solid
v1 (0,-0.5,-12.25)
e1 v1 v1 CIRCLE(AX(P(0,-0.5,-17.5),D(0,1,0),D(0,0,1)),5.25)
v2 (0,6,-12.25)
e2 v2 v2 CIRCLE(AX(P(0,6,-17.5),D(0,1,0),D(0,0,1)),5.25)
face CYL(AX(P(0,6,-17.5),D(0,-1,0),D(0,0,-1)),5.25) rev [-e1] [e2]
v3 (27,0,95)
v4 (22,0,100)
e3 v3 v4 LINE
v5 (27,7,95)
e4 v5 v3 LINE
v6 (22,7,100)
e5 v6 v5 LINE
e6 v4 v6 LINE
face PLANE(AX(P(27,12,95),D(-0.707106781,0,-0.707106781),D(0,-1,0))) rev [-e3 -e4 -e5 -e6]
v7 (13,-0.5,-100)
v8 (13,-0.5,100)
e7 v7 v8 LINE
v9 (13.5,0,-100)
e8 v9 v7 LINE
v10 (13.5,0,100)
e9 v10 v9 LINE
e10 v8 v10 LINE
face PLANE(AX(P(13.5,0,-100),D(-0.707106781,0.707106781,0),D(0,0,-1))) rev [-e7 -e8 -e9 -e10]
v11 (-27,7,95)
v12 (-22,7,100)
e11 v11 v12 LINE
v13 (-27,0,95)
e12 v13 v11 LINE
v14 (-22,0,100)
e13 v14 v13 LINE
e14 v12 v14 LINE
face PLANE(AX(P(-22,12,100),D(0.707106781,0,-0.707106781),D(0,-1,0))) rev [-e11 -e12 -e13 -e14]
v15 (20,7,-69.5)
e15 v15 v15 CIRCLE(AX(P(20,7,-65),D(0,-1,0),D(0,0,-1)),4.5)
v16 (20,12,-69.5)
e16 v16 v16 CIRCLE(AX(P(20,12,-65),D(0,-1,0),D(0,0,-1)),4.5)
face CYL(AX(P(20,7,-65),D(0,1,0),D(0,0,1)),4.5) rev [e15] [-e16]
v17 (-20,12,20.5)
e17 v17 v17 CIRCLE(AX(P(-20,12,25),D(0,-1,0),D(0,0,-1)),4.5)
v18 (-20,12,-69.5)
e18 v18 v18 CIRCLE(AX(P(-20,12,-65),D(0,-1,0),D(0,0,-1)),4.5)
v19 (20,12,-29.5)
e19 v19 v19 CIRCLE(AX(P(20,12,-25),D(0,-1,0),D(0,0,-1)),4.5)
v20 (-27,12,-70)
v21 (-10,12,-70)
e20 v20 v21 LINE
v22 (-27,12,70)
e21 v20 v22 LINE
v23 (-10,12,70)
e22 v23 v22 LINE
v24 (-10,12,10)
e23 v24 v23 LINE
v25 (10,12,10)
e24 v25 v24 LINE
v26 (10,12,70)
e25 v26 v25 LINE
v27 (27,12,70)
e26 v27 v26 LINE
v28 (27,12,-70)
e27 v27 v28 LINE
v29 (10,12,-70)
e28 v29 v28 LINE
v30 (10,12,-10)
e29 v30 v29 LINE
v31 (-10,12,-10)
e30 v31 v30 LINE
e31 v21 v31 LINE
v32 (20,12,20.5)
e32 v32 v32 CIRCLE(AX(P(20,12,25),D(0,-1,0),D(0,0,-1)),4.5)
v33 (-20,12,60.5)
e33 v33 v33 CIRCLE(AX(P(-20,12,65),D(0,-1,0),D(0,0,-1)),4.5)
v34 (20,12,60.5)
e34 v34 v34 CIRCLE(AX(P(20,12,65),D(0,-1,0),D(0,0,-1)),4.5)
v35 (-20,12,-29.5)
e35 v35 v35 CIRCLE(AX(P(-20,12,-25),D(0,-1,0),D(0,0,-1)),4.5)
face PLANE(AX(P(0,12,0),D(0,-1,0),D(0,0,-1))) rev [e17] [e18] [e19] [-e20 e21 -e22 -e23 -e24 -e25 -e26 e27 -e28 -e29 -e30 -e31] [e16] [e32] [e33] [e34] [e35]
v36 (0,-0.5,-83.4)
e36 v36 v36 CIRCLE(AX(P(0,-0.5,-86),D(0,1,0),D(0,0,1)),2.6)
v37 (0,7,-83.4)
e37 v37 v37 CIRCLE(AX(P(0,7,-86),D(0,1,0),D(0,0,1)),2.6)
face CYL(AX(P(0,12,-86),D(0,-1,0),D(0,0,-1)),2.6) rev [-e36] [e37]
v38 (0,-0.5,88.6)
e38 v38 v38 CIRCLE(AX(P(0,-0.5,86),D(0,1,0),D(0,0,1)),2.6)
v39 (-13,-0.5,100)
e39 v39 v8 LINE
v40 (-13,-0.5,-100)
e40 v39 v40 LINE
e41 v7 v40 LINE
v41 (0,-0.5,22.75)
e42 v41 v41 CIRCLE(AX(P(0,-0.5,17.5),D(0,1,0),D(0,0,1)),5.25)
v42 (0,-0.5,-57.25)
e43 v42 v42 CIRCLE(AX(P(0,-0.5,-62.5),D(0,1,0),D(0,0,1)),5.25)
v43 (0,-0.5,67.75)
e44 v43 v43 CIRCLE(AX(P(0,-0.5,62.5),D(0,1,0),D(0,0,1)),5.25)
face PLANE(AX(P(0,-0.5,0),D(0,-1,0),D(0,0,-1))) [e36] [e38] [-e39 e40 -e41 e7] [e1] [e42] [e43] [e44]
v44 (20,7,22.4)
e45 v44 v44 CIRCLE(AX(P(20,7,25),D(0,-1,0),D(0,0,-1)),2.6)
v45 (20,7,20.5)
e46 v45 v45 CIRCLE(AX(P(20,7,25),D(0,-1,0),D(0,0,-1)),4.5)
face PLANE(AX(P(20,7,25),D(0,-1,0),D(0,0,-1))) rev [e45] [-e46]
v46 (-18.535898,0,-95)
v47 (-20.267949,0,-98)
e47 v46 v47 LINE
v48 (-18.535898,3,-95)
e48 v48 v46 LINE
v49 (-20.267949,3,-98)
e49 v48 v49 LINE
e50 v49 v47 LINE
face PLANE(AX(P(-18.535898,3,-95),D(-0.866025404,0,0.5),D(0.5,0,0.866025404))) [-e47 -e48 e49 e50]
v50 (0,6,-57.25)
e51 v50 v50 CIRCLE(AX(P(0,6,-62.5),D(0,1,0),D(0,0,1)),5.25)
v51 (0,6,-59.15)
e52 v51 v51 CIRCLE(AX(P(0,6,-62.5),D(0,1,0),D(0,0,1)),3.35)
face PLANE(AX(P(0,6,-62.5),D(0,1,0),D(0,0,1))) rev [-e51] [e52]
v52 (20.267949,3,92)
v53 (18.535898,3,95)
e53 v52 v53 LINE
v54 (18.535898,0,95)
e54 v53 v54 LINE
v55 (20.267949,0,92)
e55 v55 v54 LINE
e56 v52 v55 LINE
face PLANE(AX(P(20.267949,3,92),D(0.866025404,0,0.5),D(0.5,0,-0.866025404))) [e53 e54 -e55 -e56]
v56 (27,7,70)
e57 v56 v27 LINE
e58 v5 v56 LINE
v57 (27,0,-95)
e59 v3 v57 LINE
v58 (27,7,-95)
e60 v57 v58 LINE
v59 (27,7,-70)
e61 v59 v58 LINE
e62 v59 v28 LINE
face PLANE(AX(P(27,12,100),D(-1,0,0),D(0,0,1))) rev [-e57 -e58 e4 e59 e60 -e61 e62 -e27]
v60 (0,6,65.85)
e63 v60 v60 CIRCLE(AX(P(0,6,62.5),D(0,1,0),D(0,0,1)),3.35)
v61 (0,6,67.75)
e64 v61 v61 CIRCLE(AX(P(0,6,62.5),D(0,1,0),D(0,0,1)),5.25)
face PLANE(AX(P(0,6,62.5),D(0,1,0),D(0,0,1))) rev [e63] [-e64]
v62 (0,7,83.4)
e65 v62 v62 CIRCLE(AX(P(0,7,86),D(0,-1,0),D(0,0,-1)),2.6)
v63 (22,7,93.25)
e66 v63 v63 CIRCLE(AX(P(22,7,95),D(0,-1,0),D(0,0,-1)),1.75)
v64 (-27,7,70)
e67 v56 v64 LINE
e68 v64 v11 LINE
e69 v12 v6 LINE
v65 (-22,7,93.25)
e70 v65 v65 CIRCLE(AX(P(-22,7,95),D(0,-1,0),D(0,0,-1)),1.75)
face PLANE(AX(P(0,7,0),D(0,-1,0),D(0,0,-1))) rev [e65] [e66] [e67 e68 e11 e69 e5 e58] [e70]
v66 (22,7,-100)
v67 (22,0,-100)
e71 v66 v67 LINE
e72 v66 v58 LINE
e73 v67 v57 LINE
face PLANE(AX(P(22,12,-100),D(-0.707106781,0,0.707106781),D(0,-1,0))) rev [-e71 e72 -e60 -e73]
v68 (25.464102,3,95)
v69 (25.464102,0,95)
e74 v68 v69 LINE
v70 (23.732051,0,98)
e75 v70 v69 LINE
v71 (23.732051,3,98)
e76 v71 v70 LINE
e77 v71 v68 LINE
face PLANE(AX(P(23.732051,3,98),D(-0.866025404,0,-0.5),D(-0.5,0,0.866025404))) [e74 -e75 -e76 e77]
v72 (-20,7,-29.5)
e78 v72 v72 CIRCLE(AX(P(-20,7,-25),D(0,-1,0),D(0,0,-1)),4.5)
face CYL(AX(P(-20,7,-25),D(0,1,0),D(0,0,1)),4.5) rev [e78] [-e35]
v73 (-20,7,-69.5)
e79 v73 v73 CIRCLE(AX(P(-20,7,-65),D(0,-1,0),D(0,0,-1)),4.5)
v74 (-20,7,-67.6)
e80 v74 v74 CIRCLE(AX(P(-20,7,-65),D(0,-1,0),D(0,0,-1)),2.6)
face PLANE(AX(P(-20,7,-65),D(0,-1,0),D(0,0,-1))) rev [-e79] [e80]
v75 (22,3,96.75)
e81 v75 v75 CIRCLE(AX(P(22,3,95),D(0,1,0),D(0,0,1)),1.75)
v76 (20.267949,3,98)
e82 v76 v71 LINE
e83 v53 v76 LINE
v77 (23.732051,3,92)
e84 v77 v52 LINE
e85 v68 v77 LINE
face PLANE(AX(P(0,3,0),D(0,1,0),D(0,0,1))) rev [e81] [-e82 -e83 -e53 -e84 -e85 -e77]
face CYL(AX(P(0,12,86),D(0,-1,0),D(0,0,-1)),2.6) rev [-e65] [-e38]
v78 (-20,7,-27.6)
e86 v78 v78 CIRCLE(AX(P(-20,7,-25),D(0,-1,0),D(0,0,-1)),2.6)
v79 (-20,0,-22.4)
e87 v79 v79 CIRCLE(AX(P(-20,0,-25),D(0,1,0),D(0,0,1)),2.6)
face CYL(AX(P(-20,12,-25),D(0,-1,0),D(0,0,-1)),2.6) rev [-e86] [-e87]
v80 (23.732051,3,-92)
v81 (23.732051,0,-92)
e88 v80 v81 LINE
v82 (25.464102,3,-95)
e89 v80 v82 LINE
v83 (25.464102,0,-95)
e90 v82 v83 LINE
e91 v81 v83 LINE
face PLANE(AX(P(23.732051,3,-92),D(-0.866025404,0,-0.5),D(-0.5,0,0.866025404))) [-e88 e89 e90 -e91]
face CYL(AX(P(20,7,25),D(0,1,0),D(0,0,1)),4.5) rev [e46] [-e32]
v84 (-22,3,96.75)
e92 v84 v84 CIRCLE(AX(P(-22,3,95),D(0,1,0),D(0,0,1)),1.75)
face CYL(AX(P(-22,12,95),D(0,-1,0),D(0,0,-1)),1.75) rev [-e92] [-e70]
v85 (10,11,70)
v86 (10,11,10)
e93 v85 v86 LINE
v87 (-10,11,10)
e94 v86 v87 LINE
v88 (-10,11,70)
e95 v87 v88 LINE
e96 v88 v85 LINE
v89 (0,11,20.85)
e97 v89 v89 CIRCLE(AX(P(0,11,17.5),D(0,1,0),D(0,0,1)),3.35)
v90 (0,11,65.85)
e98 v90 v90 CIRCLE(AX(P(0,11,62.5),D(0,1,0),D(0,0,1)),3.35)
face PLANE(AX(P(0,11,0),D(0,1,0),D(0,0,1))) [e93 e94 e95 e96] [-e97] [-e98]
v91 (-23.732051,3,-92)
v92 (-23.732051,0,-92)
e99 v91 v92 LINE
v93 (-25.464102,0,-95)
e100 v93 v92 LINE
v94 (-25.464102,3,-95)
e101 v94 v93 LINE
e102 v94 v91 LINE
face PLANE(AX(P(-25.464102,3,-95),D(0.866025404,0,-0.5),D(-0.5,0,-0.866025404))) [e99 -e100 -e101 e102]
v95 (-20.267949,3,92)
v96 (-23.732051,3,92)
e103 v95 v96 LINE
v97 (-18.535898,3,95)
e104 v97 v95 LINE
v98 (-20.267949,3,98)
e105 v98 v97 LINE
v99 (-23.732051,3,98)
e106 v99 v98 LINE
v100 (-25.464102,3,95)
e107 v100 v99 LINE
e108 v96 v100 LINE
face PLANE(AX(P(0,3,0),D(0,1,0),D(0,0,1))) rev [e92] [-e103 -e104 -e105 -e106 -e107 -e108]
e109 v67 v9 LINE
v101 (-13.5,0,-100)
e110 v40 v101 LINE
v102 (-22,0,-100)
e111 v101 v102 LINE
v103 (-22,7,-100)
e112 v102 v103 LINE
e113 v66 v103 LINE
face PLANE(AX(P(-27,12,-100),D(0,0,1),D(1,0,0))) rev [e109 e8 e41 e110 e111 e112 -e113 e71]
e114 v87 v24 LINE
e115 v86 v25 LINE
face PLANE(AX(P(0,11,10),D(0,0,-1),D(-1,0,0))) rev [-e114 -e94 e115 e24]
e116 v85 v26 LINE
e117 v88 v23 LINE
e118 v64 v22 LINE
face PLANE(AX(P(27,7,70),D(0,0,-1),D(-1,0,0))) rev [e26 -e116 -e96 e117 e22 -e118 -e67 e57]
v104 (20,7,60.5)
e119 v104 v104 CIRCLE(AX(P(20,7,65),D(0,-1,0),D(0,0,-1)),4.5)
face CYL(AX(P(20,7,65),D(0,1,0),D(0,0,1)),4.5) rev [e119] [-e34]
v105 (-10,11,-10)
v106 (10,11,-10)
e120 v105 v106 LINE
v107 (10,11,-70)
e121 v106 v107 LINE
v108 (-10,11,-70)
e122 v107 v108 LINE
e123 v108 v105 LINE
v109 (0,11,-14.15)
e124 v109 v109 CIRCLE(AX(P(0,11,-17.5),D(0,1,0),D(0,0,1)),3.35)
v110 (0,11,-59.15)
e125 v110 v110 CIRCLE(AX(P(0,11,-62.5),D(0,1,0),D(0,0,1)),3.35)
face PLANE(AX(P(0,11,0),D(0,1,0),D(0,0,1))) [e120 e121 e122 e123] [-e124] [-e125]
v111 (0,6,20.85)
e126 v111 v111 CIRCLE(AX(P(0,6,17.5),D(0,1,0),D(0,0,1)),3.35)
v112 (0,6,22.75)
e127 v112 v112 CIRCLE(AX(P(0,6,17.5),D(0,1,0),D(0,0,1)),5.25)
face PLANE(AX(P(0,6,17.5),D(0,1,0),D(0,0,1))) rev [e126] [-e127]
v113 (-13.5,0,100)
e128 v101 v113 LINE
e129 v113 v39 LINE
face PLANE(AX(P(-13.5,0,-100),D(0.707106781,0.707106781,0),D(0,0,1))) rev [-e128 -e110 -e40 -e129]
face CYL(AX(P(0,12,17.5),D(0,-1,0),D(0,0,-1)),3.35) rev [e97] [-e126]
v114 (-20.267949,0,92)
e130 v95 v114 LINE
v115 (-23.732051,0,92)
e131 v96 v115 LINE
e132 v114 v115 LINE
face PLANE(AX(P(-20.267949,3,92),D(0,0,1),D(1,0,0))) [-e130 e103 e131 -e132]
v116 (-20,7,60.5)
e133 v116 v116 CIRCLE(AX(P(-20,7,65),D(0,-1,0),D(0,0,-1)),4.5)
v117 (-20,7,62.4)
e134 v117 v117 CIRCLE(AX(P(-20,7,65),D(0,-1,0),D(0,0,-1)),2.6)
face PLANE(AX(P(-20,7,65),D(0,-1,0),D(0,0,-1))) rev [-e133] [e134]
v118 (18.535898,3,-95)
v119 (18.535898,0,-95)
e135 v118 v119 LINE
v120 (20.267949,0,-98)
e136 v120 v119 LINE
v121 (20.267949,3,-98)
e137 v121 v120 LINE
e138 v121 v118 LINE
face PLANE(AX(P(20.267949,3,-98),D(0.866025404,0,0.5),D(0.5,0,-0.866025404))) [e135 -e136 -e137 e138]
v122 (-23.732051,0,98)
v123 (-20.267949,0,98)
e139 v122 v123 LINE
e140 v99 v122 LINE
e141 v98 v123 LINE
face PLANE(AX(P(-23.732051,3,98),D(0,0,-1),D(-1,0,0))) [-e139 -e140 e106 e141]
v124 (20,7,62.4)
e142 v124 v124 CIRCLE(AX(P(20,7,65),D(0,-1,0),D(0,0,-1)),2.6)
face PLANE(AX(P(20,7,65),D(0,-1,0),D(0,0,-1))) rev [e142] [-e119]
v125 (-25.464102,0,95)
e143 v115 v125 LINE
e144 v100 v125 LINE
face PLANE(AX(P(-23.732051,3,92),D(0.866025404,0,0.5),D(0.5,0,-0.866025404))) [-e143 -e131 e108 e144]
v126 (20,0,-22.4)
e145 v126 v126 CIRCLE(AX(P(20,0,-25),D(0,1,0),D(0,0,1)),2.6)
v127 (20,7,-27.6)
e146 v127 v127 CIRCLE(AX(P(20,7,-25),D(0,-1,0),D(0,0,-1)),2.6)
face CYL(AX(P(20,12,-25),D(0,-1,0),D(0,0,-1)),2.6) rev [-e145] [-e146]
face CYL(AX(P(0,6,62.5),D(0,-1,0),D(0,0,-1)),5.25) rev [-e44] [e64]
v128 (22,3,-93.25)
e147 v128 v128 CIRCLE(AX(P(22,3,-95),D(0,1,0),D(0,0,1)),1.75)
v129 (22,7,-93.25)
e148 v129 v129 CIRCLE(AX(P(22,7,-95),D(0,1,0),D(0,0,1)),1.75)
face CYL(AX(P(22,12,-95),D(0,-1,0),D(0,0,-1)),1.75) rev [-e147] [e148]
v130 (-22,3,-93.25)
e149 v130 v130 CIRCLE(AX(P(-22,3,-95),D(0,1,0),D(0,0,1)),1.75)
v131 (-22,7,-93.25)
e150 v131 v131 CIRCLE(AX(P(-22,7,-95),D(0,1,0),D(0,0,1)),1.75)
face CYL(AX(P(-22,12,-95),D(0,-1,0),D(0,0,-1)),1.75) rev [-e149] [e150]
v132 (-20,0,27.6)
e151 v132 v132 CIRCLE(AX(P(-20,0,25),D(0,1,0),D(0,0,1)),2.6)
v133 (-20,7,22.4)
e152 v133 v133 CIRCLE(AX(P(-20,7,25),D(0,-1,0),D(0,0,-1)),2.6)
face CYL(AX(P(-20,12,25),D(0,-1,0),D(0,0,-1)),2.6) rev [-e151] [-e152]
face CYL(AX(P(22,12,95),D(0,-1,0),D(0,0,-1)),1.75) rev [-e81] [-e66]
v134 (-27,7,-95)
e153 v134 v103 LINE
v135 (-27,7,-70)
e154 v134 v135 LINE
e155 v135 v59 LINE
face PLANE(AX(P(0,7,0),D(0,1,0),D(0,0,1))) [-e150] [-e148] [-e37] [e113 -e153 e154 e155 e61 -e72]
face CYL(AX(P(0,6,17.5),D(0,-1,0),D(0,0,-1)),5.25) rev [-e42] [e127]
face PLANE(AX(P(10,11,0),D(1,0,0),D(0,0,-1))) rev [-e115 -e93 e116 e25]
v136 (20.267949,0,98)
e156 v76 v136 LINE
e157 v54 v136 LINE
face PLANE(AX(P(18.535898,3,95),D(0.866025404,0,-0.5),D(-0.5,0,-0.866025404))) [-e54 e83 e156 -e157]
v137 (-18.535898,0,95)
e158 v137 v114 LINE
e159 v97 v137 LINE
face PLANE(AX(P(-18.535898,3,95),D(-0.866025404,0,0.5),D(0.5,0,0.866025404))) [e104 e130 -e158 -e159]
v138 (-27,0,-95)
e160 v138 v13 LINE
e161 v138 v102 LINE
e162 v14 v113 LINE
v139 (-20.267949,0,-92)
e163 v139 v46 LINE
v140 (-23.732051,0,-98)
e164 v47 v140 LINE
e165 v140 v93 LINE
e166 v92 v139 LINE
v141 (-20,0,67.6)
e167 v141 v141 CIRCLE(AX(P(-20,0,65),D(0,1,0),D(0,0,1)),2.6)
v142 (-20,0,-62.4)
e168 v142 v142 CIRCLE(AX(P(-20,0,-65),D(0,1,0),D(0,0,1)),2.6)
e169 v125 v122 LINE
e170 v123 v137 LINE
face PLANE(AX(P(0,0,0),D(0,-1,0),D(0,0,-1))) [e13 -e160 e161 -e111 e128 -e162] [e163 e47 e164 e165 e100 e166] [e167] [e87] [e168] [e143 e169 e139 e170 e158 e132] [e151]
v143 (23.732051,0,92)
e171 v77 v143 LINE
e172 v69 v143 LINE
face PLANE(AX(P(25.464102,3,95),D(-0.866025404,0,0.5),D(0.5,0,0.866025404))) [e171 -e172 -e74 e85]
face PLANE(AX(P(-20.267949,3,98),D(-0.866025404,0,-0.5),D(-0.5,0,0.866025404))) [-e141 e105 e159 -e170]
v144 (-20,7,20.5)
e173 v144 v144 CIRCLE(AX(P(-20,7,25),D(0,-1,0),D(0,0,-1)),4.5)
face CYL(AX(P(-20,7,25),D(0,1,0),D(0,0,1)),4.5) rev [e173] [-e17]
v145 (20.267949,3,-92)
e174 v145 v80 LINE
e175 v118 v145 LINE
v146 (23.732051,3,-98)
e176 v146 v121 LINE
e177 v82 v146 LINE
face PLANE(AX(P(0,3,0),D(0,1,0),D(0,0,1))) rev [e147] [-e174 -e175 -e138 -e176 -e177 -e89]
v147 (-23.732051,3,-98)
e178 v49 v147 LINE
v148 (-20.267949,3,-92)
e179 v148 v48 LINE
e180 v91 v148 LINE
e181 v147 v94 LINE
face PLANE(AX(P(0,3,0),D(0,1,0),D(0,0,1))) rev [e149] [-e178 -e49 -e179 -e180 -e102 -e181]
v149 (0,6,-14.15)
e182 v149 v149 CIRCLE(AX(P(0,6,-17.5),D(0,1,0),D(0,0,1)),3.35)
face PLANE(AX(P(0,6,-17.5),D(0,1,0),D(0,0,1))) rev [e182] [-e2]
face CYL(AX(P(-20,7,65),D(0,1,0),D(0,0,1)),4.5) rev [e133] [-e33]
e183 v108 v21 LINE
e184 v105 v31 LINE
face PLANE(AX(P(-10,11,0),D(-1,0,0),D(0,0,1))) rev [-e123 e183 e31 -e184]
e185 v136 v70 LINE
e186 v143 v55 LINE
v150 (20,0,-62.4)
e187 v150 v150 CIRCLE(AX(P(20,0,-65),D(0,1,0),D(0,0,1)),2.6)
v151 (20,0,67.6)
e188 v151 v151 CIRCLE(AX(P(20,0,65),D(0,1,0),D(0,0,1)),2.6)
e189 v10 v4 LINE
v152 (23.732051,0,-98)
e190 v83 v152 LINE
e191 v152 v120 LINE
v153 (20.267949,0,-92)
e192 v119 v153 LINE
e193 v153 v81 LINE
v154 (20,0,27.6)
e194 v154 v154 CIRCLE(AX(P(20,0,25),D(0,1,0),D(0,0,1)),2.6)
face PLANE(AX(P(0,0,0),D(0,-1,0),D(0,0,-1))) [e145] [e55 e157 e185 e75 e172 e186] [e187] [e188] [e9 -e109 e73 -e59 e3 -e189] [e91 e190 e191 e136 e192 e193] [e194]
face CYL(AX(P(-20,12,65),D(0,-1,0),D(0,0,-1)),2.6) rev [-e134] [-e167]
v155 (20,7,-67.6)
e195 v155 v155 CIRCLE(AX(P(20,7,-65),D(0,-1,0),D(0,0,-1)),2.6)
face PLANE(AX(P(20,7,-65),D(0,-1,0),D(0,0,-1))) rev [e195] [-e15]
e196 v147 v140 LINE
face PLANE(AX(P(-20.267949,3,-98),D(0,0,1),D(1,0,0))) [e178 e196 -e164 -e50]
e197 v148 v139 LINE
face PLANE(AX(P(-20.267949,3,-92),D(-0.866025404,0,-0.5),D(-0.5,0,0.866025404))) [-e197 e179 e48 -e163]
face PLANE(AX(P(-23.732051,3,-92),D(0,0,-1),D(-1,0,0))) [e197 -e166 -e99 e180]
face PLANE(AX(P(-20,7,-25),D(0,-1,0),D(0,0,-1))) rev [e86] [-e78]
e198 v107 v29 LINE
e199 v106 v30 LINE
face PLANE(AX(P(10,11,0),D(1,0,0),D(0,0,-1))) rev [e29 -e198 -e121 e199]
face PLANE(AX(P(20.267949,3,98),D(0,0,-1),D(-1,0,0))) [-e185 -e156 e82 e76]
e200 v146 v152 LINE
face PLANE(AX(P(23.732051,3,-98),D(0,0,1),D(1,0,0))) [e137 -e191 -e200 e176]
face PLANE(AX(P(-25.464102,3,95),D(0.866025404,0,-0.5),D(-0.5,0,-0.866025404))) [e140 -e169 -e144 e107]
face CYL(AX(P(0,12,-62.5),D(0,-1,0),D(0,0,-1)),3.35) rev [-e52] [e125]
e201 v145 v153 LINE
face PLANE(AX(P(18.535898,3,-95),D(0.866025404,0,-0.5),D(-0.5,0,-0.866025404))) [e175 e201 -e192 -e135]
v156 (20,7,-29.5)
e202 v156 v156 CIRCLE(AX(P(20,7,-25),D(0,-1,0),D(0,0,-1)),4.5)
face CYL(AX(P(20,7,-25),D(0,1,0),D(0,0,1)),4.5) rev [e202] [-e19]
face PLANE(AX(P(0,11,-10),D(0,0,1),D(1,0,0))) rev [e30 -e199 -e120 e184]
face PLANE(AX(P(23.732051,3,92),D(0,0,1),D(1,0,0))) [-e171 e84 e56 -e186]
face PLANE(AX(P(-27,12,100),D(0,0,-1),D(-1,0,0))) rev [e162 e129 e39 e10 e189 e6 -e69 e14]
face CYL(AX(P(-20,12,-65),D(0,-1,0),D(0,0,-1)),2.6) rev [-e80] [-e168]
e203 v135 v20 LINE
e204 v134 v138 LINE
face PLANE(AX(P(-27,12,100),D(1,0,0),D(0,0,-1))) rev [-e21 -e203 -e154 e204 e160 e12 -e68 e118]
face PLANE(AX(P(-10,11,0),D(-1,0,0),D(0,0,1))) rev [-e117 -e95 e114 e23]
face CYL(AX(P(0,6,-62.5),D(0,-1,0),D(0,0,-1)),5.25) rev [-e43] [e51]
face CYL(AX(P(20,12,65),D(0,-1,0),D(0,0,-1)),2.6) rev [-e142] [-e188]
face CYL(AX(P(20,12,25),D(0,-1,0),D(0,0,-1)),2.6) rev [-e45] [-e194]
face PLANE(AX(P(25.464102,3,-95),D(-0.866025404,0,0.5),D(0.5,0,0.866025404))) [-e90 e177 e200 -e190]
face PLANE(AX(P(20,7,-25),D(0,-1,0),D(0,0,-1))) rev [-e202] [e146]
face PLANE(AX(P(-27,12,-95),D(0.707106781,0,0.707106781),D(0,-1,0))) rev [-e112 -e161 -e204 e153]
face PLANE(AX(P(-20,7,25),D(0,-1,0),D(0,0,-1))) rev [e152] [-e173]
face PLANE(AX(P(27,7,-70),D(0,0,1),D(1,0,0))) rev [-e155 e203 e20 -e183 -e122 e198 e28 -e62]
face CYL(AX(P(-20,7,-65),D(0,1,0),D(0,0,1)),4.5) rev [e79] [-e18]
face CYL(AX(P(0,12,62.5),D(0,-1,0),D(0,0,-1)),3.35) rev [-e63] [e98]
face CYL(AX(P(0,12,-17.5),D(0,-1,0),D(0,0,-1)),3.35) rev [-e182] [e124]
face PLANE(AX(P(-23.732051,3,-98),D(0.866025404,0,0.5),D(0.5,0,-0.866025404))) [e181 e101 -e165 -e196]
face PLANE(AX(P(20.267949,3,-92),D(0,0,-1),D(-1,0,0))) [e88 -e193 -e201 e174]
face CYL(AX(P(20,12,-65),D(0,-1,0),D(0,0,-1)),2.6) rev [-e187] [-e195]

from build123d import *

# Parameters (mm, degrees)
SKETCH1_W               = 54
SKETCH1_H               = 200
SKETCH1_R               = 2.6
SKETCH1_R_2             = 3.35
BOSS_EXTRUDE1_DEPTH     = 12
SKETCH4_R               = 5.25
CUT_EXTRUDE2_DEPTH      = 6
CUT_EXTRUDE3_START      = 12
SKETCH5_W               = 20
SKETCH5_H               = 60
CUT_EXTRUDE3_DEPTH      = 1
CUT_EXTRUDE4_DEPTH      = 105.273678366
CUT_EXTRUDE4_DEPTH_BACK = 105.273678366
SKETCH6_R               = 1.75
CUT_EXTRUDE5_DEPTH      = 3
CHAMFER2_SIZE           = 5
BOSS_EXTRUDE3_START     = -0.5
SKETCH9_W               = 27
SKETCH9_H               = 200
SKETCH9_R               = 2.6
SKETCH9_R_2             = 5.25
BOSS_EXTRUDE3_DEPTH     = 0.5
CHAMFER3_SIZE           = 0.5
SKETCH10_W              = 54
SKETCH10_H              = 30
CUT_EXTRUDE6_DEPTH      = 5
CUT_EXTRUDE7_START      = 12
SKETCH11_R              = 4.5
CUT_EXTRUDE7_DEPTH      = 5


with BuildPart() as part:
    # Sketch1 → Boss-Extrude1 (new body)
    with BuildSketch(Plane(origin=(0, 0, 0), x_dir=(1, 0, 0), z_dir=(0, 1, 0))):
        Rectangle(SKETCH1_W, SKETCH1_H)
        with Locations(Location((0, 86, 0), (0, 0, 270))):
            Circle(SKETCH1_R, mode=Mode.SUBTRACT)
        with Locations(Location((0, -86, 0), (0, 0, 270))):
            Circle(SKETCH1_R, mode=Mode.SUBTRACT)
        with Locations(Location((0, 62.5, 0), (0, 0, 270))):
            Circle(SKETCH1_R_2, mode=Mode.SUBTRACT)
        with Locations(Location((0, 17.5, 0), (0, 0, 270))):
            Circle(SKETCH1_R_2, mode=Mode.SUBTRACT)
        with Locations(Location((0, -17.5, 0), (0, 0, 270))):
            Circle(SKETCH1_R_2, mode=Mode.SUBTRACT)
        with Locations(Location((0, -62.5, 0), (0, 0, 270))):
            Circle(SKETCH1_R_2, mode=Mode.SUBTRACT)
        with Locations(Location((-20, -65, 0), (0, 0, 270))):
            Circle(SKETCH1_R, mode=Mode.SUBTRACT)
        with Locations(Location((20, -65, 0), (0, 0, 270))):
            Circle(SKETCH1_R, mode=Mode.SUBTRACT)
        with Locations(Location((20, -25, 0), (0, 0, 270))):
            Circle(SKETCH1_R, mode=Mode.SUBTRACT)
        with Locations(Location((-20, -25, 0), (0, 0, 270))):
            Circle(SKETCH1_R, mode=Mode.SUBTRACT)
        with Locations(Location((-20, 25, 0), (0, 0, 270))):
            Circle(SKETCH1_R, mode=Mode.SUBTRACT)
        with Locations(Location((20, 25, 0), (0, 0, 270))):
            Circle(SKETCH1_R, mode=Mode.SUBTRACT)
        with Locations(Location((20, 65, 0), (0, 0, 270))):
            Circle(SKETCH1_R, mode=Mode.SUBTRACT)
        with Locations(Location((-20, 65, 0), (0, 0, 270))):
            Circle(SKETCH1_R, mode=Mode.SUBTRACT)
    extrude(amount=BOSS_EXTRUDE1_DEPTH)

    # Sketch4 → Cut-Extrude2 (cut)
    with BuildSketch(Plane(origin=(0, 0, 0), x_dir=(1, 0, 0), z_dir=(0, 1, 0))):
        with Locations(Location((0, 62.5, 0), (0, 0, 270))):
            Circle(SKETCH4_R)
        with Locations(Location((0, 17.5, 0), (0, 0, 270))):
            Circle(SKETCH4_R)
        with Locations(Location((0, -17.5, 0), (0, 0, 270))):
            Circle(SKETCH4_R)
        with Locations(Location((0, -62.5, 0), (0, 0, 270))):
            Circle(SKETCH4_R)
    extrude(amount=CUT_EXTRUDE2_DEPTH, mode=Mode.SUBTRACT)

    # Sketch5 → Cut-Extrude3 (cut)
    with BuildSketch(Plane(origin=(0, 0, 0), x_dir=(1, 0, 0), z_dir=(0, 1, 0)).offset(CUT_EXTRUDE3_START)):
        with Locations((0, 40)):
            Rectangle(SKETCH5_W, SKETCH5_H)
        with Locations((0, -40)):
            Rectangle(SKETCH5_W, SKETCH5_H)
    extrude(amount=-CUT_EXTRUDE3_DEPTH, mode=Mode.SUBTRACT)

    # Sketch6 → Cut-Extrude4 (cut, two sides: drawn at the far end of the back side and taken through both)
    with BuildSketch(Plane(origin=(0, 0, 0), x_dir=(1, 0, 0), z_dir=(0, 1, 0)).offset(-CUT_EXTRUDE4_DEPTH_BACK)):
        with Locations(Location((22, 95, 0), (0, 0, 90))):
            Circle(SKETCH6_R)
        with Locations(Location((22, -95, 0), (0, 0, 90))):
            Circle(SKETCH6_R)
        with Locations(Location((-22, -95, 0), (0, 0, 90))):
            Circle(SKETCH6_R)
        with Locations(Location((-22, 95, 0), (0, 0, 90))):
            Circle(SKETCH6_R)
    extrude(amount=CUT_EXTRUDE4_DEPTH + CUT_EXTRUDE4_DEPTH_BACK, mode=Mode.SUBTRACT)

    # Sketch7 → Cut-Extrude5 (cut)
    with BuildSketch(Plane(origin=(0, 0, 0), x_dir=(1, 0, 0), z_dir=(0, 1, 0))):
        Polygon((18.535898385, 95), (20.267949192, 92), (23.732050808, 92), (25.464101615, 95), (23.732050808, 98), (20.267949192, 98), align=None)
        Polygon((18.535898385, -95), (20.267949192, -98), (23.732050808, -98), (25.464101615, -95), (23.732050808, -92), (20.267949192, -92), align=None)
        Polygon((-25.464101615, -95), (-23.732050808, -98), (-20.267949192, -98), (-18.535898385, -95), (-20.267949192, -92), (-23.732050808, -92), align=None)
        Polygon((-25.464101615, 95), (-23.732050808, 92), (-20.267949192, 92), (-18.535898385, 95), (-20.267949192, 98), (-23.732050808, 98), align=None)
    extrude(amount=CUT_EXTRUDE5_DEPTH, mode=Mode.SUBTRACT)

    # Chamfer2
    chamfer2_edges = [part.edges().sort_by_distance(p)[0] for p in [
        (27, 6, 100),
        (-27, 6, 100),
        (-27, 6, -100),
        (27, 6, -100),
    ]]
    chamfer(chamfer2_edges, length=CHAMFER2_SIZE)

    # Sketch9 → Boss-Extrude3 (add)
    with BuildSketch(Plane(origin=(0, 0, 0), x_dir=(1, 0, 0), z_dir=(0, 1, 0)).offset(BOSS_EXTRUDE3_START)):
        Rectangle(SKETCH9_W, SKETCH9_H)
        with Locations(Location((0, -86, 0), (0, 0, 270))):
            Circle(SKETCH9_R, mode=Mode.SUBTRACT)
        with Locations(Location((0, -62.5, 0), (0, 0, 270))):
            Circle(SKETCH9_R_2, mode=Mode.SUBTRACT)
        with Locations(Location((0, -17.5, 0), (0, 0, 270))):
            Circle(SKETCH9_R_2, mode=Mode.SUBTRACT)
        with Locations(Location((0, 17.5, 0), (0, 0, 270))):
            Circle(SKETCH9_R_2, mode=Mode.SUBTRACT)
        with Locations(Location((0, 62.5, 0), (0, 0, 270))):
            Circle(SKETCH9_R_2, mode=Mode.SUBTRACT)
        with Locations(Location((0, 86, 0), (0, 0, 270))):
            Circle(SKETCH9_R, mode=Mode.SUBTRACT)
    extrude(amount=BOSS_EXTRUDE3_DEPTH)

    # Chamfer3
    chamfer3_edges = [part.edges().sort_by_distance(p)[0] for p in [
        (-13.5, -0.5, 0),
        (13.5, -0.5, 0),
    ]]
    chamfer(chamfer3_edges, length=CHAMFER3_SIZE - 0.0001)  # a hair under: the kernel refuses the full size

    # Sketch10 → Cut-Extrude6 (cut)
    with BuildSketch(Plane(origin=(0, 12, 0), x_dir=(1, 0, 0), z_dir=(0, 1, 0))):
        with Locations((0, -85)):
            Rectangle(SKETCH10_W, SKETCH10_H)
        with Locations((0, 85)):
            Rectangle(SKETCH10_W, SKETCH10_H)
    extrude(amount=-CUT_EXTRUDE6_DEPTH, mode=Mode.SUBTRACT)

    # Sketch11 → Cut-Extrude7 (cut)
    with BuildSketch(Plane(origin=(0, 0, 0), x_dir=(1, 0, 0), z_dir=(0, 1, 0)).offset(CUT_EXTRUDE7_START)):
        with Locations(Location((20, 65, 0), (0, 0, 90))):
            Circle(SKETCH11_R)
        with Locations(Location((-20, 65, 0), (0, 0, 90))):
            Circle(SKETCH11_R)
        with Locations(Location((-20, 25, 0), (0, 0, 90))):
            Circle(SKETCH11_R)
        with Locations(Location((20, 25, 0), (0, 0, 90))):
            Circle(SKETCH11_R)
        with Locations(Location((20, -25, 0), (0, 0, 90))):
            Circle(SKETCH11_R)
        with Locations(Location((-20, -25, 0), (0, 0, 90))):
            Circle(SKETCH11_R)
        with Locations(Location((-20, -65, 0), (0, 0, 90))):
            Circle(SKETCH11_R)
        with Locations(Location((20, -65, 0), (0, 0, 90))):
            Circle(SKETCH11_R)
    extrude(amount=-CUT_EXTRUDE7_DEPTH, mode=Mode.SUBTRACT)


solid = part.part
